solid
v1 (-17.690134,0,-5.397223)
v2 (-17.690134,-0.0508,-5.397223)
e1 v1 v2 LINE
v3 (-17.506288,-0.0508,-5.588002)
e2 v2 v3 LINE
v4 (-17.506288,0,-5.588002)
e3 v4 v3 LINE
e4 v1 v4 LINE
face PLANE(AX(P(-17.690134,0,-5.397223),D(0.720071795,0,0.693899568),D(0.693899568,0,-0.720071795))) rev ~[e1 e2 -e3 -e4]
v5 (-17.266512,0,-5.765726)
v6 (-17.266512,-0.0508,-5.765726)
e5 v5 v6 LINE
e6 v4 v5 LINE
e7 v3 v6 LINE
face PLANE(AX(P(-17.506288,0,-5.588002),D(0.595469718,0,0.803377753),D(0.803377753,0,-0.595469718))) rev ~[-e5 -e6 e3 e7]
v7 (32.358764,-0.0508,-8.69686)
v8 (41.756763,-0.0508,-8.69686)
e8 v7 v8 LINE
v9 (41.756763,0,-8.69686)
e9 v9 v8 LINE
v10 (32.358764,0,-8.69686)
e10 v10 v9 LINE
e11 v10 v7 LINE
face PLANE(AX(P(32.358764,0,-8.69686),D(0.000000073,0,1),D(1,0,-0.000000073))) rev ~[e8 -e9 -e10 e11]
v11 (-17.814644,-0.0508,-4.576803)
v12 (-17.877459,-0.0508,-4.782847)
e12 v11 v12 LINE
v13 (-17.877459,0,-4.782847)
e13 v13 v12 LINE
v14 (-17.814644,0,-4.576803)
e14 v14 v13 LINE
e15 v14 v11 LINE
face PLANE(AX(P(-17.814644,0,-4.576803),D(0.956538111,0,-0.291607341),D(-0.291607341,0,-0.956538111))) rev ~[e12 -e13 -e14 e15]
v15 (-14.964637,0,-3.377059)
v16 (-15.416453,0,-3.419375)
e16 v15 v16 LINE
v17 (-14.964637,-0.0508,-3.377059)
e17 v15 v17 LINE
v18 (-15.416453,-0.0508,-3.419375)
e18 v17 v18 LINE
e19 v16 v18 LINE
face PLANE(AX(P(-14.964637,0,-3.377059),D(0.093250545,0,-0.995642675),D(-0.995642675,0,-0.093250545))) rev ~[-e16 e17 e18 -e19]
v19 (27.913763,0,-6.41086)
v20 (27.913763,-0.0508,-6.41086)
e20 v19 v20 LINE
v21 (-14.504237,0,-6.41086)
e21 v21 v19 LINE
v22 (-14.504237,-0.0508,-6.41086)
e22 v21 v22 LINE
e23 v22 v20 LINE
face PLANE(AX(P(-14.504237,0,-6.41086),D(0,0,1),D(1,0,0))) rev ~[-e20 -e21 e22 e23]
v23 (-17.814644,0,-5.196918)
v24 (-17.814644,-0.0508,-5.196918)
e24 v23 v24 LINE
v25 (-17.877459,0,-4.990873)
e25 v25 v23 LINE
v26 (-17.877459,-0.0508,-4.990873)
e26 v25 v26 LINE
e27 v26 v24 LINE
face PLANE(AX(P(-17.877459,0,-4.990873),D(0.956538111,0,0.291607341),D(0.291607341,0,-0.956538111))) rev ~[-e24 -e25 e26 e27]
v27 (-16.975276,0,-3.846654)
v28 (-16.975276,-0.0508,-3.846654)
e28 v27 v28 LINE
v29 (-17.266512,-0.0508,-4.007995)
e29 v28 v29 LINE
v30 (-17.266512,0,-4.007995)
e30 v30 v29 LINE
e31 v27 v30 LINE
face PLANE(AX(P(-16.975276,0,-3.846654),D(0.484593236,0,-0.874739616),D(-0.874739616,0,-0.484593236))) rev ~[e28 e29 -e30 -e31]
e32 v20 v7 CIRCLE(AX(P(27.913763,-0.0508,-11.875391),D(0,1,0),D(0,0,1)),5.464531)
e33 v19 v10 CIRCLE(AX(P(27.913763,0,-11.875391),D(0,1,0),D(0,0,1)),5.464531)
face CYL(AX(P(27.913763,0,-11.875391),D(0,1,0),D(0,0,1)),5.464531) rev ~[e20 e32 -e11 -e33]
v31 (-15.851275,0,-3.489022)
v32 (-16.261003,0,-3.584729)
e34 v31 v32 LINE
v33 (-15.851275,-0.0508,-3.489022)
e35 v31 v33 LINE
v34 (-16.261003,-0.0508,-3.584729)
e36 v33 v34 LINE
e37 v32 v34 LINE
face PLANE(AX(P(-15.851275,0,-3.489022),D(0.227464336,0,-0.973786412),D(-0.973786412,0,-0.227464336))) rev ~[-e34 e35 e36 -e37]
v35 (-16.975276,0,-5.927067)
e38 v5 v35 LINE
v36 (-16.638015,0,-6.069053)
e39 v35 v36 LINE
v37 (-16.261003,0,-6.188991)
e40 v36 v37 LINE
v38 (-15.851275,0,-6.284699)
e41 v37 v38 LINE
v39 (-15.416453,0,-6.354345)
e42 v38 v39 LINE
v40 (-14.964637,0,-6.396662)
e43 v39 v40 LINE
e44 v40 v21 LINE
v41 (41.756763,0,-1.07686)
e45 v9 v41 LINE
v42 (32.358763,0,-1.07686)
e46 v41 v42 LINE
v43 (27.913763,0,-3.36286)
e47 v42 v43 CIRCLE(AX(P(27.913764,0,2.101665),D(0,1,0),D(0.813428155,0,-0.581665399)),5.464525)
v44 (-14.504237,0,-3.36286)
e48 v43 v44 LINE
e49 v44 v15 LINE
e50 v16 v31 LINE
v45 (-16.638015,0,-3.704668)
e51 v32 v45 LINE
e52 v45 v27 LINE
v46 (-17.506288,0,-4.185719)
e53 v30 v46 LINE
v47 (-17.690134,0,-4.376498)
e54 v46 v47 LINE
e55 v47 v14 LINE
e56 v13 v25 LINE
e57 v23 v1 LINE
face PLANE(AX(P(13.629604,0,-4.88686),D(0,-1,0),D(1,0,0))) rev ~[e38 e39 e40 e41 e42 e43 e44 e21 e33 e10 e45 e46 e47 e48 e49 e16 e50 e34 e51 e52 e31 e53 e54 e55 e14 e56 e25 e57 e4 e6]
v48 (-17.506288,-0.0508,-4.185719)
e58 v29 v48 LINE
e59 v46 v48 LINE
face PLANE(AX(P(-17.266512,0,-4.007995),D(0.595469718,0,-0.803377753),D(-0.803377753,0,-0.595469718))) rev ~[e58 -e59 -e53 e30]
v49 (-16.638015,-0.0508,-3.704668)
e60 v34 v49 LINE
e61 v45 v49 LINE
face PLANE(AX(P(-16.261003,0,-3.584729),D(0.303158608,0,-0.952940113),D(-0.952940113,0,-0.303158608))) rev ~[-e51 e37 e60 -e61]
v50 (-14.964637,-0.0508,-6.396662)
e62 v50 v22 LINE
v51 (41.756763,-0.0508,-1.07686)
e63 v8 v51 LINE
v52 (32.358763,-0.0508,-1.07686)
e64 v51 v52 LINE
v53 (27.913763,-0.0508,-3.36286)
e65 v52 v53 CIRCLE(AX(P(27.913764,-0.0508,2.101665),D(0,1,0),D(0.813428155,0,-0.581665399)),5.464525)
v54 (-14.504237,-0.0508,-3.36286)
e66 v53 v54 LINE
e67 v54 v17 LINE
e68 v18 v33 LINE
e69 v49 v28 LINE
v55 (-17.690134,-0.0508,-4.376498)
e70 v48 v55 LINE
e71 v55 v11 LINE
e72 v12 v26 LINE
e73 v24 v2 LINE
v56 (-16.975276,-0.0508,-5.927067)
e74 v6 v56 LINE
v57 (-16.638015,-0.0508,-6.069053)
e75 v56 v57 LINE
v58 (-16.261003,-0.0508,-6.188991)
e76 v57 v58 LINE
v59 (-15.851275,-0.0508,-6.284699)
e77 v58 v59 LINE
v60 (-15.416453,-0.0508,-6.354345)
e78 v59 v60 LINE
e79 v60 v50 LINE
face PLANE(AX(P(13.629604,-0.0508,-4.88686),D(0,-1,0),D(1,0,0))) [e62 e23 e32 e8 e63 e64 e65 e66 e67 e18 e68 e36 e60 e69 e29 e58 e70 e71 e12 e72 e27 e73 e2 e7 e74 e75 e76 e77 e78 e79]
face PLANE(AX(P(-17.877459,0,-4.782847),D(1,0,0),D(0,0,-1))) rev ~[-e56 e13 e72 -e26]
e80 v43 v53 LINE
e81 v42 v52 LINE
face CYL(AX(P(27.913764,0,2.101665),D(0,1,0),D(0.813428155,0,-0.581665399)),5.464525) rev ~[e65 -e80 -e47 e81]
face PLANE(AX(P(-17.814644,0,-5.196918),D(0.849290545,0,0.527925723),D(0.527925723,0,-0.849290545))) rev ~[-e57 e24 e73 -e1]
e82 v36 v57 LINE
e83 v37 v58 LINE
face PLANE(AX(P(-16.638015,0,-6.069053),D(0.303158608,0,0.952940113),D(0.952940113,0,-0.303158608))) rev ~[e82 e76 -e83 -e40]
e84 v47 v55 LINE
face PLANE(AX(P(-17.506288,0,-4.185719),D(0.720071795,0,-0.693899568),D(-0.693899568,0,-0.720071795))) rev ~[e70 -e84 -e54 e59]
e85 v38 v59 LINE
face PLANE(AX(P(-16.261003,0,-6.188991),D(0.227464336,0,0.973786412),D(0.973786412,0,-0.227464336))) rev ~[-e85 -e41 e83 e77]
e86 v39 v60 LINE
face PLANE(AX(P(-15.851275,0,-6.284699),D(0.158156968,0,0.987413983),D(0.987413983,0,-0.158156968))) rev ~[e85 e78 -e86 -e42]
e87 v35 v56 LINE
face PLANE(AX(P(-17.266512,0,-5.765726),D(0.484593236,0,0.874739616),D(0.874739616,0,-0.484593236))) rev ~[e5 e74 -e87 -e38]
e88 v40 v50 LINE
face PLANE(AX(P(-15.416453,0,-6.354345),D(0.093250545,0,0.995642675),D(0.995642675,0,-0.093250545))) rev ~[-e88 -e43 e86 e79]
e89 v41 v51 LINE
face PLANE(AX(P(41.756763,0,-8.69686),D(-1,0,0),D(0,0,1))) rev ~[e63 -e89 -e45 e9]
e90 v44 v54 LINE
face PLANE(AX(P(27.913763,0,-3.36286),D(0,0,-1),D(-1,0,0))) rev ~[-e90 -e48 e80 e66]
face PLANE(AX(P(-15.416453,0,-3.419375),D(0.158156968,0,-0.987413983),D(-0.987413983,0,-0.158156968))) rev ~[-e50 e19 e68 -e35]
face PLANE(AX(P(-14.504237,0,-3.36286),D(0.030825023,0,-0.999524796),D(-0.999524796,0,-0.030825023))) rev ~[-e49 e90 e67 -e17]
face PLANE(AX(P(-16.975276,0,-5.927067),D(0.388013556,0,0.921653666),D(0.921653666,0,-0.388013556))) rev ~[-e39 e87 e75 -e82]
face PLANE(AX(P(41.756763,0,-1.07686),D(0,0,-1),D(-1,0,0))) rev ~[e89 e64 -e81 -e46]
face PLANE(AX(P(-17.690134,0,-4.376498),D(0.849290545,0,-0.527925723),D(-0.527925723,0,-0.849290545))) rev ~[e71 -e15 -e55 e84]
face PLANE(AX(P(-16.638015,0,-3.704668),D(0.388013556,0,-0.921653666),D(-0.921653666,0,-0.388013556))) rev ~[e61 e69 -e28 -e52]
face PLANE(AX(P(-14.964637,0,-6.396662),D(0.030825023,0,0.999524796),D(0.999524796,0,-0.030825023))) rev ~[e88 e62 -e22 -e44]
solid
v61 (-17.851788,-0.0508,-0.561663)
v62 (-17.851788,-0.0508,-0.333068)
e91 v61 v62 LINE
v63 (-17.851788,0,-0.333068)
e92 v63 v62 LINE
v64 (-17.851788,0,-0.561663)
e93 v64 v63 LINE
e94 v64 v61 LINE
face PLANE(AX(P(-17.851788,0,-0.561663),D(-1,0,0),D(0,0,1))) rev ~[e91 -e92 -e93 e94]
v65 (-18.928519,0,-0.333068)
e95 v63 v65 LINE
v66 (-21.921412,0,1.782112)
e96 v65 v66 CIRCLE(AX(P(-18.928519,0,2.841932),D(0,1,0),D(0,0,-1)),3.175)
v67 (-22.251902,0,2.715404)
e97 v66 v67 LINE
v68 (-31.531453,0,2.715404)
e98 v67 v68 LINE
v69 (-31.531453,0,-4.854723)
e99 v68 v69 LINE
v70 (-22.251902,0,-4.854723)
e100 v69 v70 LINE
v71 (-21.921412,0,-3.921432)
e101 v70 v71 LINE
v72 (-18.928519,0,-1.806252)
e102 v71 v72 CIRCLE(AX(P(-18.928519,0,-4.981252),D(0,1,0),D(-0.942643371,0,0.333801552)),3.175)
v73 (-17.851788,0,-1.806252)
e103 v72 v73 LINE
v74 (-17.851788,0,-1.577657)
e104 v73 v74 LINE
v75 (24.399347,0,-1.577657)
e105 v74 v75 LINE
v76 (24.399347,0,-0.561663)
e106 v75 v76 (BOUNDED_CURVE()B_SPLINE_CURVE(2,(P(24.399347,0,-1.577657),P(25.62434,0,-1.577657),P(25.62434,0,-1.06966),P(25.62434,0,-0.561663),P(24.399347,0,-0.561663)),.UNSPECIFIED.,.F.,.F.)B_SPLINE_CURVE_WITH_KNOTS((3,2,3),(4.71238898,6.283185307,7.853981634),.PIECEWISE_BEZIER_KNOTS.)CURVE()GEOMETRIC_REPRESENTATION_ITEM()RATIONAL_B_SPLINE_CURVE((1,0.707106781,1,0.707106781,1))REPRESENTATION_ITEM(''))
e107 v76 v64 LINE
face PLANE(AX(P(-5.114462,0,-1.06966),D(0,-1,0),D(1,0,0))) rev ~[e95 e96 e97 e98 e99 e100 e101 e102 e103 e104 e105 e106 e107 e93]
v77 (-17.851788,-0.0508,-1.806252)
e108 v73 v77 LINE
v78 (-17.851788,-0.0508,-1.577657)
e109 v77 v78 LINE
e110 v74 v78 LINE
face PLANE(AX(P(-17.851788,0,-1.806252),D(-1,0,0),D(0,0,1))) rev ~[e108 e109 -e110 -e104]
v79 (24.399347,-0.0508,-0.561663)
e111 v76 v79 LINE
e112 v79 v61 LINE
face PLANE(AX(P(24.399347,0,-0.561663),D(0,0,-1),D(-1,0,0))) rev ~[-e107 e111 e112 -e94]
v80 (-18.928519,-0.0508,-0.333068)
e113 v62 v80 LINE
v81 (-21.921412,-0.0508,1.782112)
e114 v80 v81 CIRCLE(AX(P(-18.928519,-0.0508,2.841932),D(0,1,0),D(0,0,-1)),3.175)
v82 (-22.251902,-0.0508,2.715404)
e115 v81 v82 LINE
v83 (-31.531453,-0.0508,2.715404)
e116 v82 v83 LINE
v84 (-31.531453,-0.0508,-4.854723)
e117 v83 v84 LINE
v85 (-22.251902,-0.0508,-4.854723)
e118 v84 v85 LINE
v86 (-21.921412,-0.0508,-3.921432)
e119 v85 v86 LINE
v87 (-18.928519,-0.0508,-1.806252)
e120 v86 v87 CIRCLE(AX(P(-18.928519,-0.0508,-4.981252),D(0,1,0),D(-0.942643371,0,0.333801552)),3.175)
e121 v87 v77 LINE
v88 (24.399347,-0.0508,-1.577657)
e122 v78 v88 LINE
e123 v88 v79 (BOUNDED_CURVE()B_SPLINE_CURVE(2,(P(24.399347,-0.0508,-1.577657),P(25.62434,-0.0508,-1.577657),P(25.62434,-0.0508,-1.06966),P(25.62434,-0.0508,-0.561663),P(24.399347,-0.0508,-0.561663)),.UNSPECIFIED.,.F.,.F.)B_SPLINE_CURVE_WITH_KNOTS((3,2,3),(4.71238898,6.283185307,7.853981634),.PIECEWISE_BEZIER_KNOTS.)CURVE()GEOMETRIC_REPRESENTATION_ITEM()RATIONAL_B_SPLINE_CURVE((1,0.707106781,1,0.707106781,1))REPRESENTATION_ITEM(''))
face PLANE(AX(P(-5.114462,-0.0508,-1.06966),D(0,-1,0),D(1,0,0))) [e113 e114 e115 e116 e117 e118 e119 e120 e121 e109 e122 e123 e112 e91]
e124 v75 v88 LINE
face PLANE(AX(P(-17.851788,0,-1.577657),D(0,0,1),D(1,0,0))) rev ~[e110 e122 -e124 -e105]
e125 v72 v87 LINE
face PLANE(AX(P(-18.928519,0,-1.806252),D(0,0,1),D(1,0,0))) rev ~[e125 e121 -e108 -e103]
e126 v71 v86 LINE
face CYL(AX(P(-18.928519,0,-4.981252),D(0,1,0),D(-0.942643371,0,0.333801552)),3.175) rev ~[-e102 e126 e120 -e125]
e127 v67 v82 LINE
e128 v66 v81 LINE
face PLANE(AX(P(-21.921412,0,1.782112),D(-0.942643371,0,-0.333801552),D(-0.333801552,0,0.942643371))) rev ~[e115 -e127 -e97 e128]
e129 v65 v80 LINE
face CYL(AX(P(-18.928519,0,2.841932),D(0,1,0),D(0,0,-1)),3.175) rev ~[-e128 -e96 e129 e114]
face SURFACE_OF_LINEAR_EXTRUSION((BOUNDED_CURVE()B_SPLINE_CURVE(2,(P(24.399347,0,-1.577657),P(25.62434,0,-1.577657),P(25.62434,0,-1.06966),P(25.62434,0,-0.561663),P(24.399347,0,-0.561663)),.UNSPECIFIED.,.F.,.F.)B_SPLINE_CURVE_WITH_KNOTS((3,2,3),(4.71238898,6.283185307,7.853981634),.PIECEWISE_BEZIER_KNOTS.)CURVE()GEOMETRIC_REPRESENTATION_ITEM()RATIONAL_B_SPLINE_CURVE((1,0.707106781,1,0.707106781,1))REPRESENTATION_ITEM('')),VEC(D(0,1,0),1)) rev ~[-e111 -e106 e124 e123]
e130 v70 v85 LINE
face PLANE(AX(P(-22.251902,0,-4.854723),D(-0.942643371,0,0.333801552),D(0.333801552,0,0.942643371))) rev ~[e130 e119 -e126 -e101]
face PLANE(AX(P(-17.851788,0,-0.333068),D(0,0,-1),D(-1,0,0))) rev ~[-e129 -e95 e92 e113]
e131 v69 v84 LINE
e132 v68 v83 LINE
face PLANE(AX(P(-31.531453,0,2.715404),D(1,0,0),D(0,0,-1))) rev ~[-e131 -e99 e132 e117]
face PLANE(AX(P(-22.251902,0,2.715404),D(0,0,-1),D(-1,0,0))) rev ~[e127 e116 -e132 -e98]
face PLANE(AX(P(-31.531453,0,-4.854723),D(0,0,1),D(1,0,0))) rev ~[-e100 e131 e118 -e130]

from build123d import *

# Parameters (mm, degrees)
F2_DEPTH = 0.0508


# Not quite as in the source:
# - ends of sketch curves that miss each other by under 0.0002 mm in the source are joined


with BuildPart() as f2:
    # F0 (on Front) → F2 (new body)
    with BuildSketch(Plane.XZ):
        with BuildLine():
            Line((-22.2519018109, 2.7154037545), (-31.5314531326, 2.7154037545))
            Line((-31.5314531326, 2.7154037545), (-31.5314531326, -4.8547233455))
            Line((-31.5314531326, -4.8547233455), (-22.2519018109, -4.8547233455))
            Line((-22.2519018109, -4.8547233455), (-21.9214119342, -3.9214320238))
            ThreePointArc((-21.9214119342, -3.9214320238), (-20.7609625105, -2.3884201716), (-18.9285192327, -1.8062519505))
            Line((-18.9285192327, -1.8062519505), (-17.8517878327, -1.8062519505))
            Line((-17.8517878327, -1.8062519505), (-17.8517878327, -1.577656713))
            Line((-17.8517878327, -1.577656713), (24.3993468673, -1.577656713))
            add(Edge.make_bspline(
                [(24.3993468673, -1.577656713), (25.6243397865, -1.577656713), (25.6243397865, -1.0696597955), (25.6243397865, -0.5616628779), (24.3993468673, -0.5616628779)],
                knots=[4.7123889804, 4.7123889804, 4.7123889804, 6.2831853072, 6.2831853072, 7.853981634, 7.853981634, 7.853981634], degree=2, weights=[1, 0.7071067812, 1, 0.7071067812, 1]))
            Line((24.3993468673, -0.5616628779), (-17.8517878327, -0.5616628779))
            Line((-17.8517878327, -0.5616628779), (-17.8517878327, -0.3330676404))
            Line((-17.8517878327, -0.3330676404), (-18.9285192327, -0.3330676404))
            ThreePointArc((-18.9285192327, -0.3330676404), (-20.7609625105, 0.2491005807), (-21.9214119342, 1.7821124329))
            Line((-21.9214119342, 1.7821124329), (-22.2519018109, 2.7154037545))
        make_face()
    extrude(amount=F2_DEPTH)


with BuildPart() as f2b:
    # F1 (on Front) → F2, piece 2 (new body)
    with BuildSketch(Plane.XZ):
        with BuildLine():
            Line((27.9137630355, -3.3628604373), (-14.5042369645, -3.3628604373))
            Line((-14.5042369645, -3.3628604373), (-14.9646373645, -3.3770590373))
            Line((-14.9646373645, -3.3770590373), (-15.4164525645, -3.4193754373))
            Line((-15.4164525645, -3.4193754373), (-15.8512751645, -3.4890222373))
            Line((-15.8512751645, -3.4890222373), (-16.2610025645, -3.5847294373))
            Line((-16.2610025645, -3.5847294373), (-16.6380147645, -3.7046682373))
            Line((-16.6380147645, -3.7046682373), (-16.9752759645, -3.8466542373))
            Line((-16.9752759645, -3.8466542373), (-17.2665123645, -4.0079950373))
            Line((-17.2665123645, -4.0079950373), (-17.5062883645, -4.1857188373))
            Line((-17.5062883645, -4.1857188373), (-17.6901335645, -4.3764982373))
            Line((-17.6901335645, -4.3764982373), (-17.8146443645, -4.5768026373))
            Line((-17.8146443645, -4.5768026373), (-17.8774585645, -4.7828474373))
            Line((-17.8774585645, -4.7828474373), (-17.8774585645, -4.9908734373))
            Line((-17.8774585645, -4.9908734373), (-17.8146443645, -5.1969182373))
            Line((-17.8146443645, -5.1969182373), (-17.6901335645, -5.3972226373))
            Line((-17.6901335645, -5.3972226373), (-17.5062883645, -5.5880020373))
            Line((-17.5062883645, -5.5880020373), (-17.2665123645, -5.7657258373))
            Line((-17.2665123645, -5.7657258373), (-16.9752759645, -5.9270666373))
            Line((-16.9752759645, -5.9270666373), (-16.6380147645, -6.0690526373))
            Line((-16.6380147645, -6.0690526373), (-16.2610025645, -6.1889914373))
            Line((-16.2610025645, -6.1889914373), (-15.8512751645, -6.2846986373))
            Line((-15.8512751645, -6.2846986373), (-15.4164525645, -6.3543454373))
            Line((-15.4164525645, -6.3543454373), (-14.9646373645, -6.3966618373))
            Line((-14.9646373645, -6.3966618373), (-14.5042369645, -6.4108604373))
            Line((-14.5042369645, -6.4108604373), (27.9137630355, -6.4108604373))
            ThreePointArc((27.9137630355, -6.4108604373), (30.4129542245, -7.0158501043), (32.3587639958, -8.6968597505))
            Line((32.3587639958, -8.6968597505), (41.7567630355, -8.6968604373))
            Line((41.7567630355, -8.6968604373), (41.7567630355, -1.0768604373))
            Line((41.7567630355, -1.0768604373), (32.3587630355, -1.0768604373))
            ThreePointArc((32.3587630355, -1.0768604373), (30.4129542245, -2.7578707702), (27.9137630355, -3.3628604373))
        make_face()
    extrude(amount=F2_DEPTH)


solid = Compound([f2.part, f2b.part])
